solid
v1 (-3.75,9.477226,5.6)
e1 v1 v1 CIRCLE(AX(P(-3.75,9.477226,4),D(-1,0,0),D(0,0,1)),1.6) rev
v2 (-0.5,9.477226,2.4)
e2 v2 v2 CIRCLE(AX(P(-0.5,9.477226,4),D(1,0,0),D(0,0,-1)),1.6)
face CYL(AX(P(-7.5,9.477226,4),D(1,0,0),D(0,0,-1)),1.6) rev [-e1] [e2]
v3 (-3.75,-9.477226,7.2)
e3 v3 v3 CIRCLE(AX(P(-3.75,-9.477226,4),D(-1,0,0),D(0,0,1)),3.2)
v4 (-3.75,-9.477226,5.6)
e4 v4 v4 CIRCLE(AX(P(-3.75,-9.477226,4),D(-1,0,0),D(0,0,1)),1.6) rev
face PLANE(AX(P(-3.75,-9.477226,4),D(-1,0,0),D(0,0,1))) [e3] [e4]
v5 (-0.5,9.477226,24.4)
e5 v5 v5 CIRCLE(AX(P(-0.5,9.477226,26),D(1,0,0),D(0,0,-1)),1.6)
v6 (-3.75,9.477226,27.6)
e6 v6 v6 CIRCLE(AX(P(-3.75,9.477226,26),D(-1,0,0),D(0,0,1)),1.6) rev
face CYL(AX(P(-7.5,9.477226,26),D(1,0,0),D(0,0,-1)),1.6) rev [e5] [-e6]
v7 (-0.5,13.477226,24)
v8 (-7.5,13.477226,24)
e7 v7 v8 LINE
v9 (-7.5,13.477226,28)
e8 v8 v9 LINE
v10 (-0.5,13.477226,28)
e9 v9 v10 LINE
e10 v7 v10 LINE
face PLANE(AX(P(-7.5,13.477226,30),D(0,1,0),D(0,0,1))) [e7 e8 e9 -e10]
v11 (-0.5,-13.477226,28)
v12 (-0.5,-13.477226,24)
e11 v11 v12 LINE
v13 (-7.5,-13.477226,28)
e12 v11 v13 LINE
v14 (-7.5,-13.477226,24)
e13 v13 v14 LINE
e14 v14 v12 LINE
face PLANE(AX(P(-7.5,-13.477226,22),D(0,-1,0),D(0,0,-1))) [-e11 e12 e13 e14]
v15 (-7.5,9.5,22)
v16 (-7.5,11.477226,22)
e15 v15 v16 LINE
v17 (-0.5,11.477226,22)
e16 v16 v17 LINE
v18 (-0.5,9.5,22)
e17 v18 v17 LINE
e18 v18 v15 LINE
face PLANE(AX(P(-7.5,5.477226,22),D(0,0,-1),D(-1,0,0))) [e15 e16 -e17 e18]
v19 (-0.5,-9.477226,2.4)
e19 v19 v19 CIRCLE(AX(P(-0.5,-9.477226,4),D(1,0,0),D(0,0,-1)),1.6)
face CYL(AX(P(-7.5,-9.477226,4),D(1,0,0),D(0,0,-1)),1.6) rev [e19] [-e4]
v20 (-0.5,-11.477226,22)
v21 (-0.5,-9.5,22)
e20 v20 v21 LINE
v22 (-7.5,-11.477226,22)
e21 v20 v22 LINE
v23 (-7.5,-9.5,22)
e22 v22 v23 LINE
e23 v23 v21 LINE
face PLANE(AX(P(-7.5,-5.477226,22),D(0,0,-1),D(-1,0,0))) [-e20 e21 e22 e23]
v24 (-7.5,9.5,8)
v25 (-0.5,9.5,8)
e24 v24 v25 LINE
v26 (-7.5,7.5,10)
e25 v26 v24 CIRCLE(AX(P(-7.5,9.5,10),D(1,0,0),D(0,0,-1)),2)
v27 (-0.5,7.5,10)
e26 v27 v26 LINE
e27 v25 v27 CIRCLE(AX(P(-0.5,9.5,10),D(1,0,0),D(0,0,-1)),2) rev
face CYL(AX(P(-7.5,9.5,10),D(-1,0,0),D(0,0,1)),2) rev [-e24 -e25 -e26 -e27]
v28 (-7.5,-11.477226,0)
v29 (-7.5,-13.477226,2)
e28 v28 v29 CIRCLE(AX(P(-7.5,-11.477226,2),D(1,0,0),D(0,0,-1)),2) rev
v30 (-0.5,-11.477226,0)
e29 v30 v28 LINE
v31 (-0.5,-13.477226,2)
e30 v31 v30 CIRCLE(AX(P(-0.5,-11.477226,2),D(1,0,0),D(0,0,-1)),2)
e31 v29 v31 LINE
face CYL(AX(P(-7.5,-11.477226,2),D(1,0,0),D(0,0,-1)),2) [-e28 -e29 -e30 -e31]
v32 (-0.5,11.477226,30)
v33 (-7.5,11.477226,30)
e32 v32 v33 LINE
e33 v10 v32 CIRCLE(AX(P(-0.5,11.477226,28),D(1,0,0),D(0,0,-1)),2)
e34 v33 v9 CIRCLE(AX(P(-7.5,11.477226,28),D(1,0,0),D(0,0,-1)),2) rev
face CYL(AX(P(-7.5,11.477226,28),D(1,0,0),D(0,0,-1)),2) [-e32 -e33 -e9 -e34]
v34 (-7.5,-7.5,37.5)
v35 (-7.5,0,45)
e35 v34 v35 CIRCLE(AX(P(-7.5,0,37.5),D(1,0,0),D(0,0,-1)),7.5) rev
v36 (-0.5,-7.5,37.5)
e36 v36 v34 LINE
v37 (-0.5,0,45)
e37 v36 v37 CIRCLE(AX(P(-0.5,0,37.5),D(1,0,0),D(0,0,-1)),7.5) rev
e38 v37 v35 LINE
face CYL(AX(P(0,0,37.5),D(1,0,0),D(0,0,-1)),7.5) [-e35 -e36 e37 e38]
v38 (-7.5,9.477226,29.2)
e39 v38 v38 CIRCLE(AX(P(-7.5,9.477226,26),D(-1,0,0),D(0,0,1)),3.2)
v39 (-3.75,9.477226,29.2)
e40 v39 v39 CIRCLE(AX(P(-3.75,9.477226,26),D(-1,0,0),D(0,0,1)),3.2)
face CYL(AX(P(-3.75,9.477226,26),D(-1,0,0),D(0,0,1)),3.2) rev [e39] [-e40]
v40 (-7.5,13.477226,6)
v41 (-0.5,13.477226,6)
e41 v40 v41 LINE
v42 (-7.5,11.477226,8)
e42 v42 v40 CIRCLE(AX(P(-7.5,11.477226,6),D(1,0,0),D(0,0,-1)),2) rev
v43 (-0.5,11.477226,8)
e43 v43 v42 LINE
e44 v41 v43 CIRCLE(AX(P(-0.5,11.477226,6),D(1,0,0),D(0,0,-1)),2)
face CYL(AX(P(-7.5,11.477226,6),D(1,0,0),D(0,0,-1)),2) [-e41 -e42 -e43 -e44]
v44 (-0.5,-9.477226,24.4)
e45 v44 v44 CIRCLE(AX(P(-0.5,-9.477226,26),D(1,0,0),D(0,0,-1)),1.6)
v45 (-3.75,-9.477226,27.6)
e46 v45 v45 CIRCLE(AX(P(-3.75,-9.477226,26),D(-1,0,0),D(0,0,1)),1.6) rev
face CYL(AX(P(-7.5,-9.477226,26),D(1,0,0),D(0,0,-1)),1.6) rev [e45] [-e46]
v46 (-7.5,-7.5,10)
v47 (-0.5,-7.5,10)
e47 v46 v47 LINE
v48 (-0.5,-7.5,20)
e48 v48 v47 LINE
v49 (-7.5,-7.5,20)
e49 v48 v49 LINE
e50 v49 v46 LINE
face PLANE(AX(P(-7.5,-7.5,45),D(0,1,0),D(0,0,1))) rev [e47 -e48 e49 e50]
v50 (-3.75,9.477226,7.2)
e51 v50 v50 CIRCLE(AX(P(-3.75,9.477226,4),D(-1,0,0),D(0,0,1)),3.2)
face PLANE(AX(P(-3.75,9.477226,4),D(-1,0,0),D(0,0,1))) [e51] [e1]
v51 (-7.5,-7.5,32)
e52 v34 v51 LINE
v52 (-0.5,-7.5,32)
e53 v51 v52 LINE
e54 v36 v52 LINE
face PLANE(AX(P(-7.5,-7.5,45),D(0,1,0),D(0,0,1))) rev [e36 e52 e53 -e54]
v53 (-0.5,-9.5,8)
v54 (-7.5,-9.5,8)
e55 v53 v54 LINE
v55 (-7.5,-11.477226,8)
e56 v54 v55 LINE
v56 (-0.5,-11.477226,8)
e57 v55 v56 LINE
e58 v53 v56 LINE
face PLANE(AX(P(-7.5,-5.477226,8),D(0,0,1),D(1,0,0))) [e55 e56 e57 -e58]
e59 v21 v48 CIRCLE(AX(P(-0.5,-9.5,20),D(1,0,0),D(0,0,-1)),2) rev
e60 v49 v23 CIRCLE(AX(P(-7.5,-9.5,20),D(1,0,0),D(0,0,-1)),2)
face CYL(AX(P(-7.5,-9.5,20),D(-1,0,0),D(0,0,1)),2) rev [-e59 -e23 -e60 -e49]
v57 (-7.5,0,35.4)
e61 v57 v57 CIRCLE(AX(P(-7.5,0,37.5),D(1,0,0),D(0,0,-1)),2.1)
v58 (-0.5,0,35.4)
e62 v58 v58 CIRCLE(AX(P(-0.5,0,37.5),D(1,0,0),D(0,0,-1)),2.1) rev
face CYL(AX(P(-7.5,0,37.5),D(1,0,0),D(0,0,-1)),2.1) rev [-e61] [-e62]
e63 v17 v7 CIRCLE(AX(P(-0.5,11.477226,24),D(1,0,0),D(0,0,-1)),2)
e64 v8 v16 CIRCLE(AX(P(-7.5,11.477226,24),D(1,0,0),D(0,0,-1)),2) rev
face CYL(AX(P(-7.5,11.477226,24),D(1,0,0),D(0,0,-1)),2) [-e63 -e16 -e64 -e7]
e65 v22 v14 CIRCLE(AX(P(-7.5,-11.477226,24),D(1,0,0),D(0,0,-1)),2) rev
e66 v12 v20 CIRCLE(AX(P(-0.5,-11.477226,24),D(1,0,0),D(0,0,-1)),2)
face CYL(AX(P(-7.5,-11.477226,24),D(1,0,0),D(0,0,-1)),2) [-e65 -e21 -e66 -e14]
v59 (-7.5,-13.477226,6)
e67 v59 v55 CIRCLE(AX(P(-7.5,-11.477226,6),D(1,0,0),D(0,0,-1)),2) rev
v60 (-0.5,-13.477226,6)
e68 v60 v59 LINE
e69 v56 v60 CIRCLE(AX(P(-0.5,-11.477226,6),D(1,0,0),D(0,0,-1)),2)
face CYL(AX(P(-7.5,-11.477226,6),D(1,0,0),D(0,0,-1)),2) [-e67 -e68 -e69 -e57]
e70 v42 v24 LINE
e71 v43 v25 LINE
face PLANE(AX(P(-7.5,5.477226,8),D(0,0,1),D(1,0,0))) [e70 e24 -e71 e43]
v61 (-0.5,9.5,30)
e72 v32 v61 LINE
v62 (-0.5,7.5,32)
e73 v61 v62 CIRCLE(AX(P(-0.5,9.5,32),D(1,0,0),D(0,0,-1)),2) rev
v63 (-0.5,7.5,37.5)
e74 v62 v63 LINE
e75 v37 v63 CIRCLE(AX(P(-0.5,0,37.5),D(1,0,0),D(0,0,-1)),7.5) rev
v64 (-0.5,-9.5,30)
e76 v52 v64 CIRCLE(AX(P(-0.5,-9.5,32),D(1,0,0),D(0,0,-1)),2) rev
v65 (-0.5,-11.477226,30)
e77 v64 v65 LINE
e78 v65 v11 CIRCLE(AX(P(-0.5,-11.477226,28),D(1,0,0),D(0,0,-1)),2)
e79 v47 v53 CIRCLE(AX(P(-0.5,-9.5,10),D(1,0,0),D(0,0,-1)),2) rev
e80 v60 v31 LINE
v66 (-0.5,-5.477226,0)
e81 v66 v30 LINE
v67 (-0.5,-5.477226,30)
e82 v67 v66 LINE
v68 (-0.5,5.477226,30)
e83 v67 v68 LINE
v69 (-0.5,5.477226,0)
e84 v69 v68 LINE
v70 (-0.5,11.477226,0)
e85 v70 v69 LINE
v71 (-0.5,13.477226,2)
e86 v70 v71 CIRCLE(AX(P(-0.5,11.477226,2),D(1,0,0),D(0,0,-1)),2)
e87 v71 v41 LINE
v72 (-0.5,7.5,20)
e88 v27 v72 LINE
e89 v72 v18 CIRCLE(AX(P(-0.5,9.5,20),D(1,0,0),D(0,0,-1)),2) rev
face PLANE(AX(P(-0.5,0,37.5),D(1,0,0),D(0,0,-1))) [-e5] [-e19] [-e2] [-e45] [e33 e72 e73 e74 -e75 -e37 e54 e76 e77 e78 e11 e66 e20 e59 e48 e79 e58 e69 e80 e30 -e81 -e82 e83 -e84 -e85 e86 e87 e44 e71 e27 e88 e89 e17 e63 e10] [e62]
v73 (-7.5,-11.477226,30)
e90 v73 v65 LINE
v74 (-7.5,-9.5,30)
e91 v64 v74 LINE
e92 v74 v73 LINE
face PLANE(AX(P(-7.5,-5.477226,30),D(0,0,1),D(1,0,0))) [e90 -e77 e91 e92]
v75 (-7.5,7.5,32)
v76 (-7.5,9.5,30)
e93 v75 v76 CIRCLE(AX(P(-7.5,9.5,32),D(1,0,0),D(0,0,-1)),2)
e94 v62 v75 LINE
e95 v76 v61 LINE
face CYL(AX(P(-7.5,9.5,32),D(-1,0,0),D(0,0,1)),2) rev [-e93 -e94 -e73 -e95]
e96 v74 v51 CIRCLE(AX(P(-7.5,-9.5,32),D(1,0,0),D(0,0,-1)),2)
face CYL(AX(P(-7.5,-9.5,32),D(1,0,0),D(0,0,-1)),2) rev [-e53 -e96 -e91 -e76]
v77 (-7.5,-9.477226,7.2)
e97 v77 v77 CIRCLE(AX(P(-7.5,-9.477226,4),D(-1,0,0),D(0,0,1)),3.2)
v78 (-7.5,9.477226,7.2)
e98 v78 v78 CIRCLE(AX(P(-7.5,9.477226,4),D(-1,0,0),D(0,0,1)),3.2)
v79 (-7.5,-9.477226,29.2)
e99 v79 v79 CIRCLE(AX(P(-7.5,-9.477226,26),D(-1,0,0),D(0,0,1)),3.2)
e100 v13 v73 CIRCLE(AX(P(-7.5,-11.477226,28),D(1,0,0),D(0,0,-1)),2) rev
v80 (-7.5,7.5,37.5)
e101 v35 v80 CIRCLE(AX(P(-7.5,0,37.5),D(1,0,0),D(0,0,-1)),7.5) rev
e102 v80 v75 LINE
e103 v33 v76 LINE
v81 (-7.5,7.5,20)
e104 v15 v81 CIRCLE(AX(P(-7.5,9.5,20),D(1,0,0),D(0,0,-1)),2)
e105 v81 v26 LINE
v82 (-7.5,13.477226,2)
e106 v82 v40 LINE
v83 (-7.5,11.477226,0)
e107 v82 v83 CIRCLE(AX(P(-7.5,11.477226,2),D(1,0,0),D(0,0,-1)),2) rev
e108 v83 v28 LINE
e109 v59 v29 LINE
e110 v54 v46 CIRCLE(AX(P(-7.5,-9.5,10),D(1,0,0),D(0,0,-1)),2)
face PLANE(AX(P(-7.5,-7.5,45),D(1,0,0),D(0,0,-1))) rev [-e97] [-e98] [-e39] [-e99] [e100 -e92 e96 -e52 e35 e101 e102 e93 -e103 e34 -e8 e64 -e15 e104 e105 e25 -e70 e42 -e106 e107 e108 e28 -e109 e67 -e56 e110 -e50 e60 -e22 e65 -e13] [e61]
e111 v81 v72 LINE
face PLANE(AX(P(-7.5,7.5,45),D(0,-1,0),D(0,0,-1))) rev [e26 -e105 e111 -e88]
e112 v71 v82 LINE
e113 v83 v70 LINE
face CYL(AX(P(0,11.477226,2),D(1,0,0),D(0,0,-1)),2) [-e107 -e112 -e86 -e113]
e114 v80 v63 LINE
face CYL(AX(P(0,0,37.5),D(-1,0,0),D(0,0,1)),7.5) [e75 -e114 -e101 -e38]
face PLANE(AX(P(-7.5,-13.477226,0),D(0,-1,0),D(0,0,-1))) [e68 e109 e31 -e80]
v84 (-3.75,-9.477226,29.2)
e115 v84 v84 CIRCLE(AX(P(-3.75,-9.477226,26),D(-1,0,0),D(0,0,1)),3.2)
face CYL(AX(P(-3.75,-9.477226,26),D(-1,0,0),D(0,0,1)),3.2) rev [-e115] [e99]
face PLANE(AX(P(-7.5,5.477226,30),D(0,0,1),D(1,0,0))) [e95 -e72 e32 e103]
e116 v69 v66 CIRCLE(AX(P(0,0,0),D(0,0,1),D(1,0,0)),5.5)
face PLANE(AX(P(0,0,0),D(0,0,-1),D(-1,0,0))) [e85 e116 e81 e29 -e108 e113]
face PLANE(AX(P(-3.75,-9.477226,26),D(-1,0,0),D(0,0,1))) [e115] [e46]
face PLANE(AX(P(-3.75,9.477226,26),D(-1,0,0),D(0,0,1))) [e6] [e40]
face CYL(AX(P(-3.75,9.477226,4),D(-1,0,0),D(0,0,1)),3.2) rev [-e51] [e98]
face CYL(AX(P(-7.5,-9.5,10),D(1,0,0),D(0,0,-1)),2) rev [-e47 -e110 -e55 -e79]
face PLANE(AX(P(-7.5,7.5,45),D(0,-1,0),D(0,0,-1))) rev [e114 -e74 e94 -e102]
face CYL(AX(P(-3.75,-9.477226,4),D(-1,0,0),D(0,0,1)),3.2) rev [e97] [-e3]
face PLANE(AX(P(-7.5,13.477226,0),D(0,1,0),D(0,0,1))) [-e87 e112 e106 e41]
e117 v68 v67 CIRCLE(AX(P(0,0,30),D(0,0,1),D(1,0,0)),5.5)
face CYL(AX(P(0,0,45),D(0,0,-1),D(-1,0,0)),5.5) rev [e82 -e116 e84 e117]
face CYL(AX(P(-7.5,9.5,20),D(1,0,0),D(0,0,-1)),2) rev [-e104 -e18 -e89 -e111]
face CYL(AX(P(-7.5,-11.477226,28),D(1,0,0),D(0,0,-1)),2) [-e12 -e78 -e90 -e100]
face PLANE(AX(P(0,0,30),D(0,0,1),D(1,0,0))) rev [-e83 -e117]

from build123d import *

# Parameters (mm, degrees)
SKETCH_1_W          = 15
SKETCH_1_H          = 15
SKETCH_1_R          = 5.5
EXTRUDE_1_DEPTH     = 45
SKETCH_5_W          = 15
SKETCH_5_H          = 15
EXTRUDE_3_DEPTH     = 15
FILLET_2_R          = 7.5
SKETCH_6_R          = 2.1
CUT_EXTRUDE_1_DEPTH = 49.023431781
CUT_EXTRUDE_2_DEPTH = 8
SKETCH_9_W          = 8
SKETCH_9_H          = 8
SKETCH_9_R          = 1.6
EXTRUDE_4_DEPTH     = 7
FILLET_3_R          = 2
SKETCH_11_R         = 3.2
CUT_EXTRUDE_3_DEPTH = 3.75


with BuildPart() as part:
    # ｽｹｯﾁ1 → ﾎﾞｽ - 押し出し1 (new body)
    with BuildSketch(Plane.XY):
        Rectangle(SKETCH_1_W, SKETCH_1_H)
        with Locations(Location((0, 0, 0), (0, 0, 180))):
            Circle(SKETCH_1_R, mode=Mode.SUBTRACT)
    extrude(amount=EXTRUDE_1_DEPTH)

    # ｽｹｯﾁ5 → ﾎﾞｽ - 押し出し3 (add)
    with BuildSketch(Plane.XY.offset(45)):
        Rectangle(SKETCH_5_W, SKETCH_5_H)
    extrude(amount=-EXTRUDE_3_DEPTH)

    # ﾌｨﾚｯﾄ2
    fillet_2_edges = [part.edges().sort_by_distance(p)[0] for p in [
        (0, -7.5, 45),
        (0, 7.5, 45),
    ]]
    fillet(fillet_2_edges, radius=FILLET_2_R - 0.0001)  # a hair under: the kernel refuses the full size

    # ｽｹｯﾁ6 → ｶｯﾄ - 押し出し1 (cut, through all)
    with BuildSketch(Plane(origin=(7.5, 0, 0), x_dir=(0, 0, -1), z_dir=(1, 0, 0))):
        with Locations((-37.5, 0)):
            Circle(SKETCH_6_R)
    extrude(amount=-CUT_EXTRUDE_1_DEPTH, mode=Mode.SUBTRACT)

    # ｽｹｯﾁ7 → ｶｯﾄ - 押し出し2 (cut)
    with BuildSketch(Plane(origin=(7.5, 0, 0), x_dir=(0, 0, -1), z_dir=(1, 0, 0))):
        with BuildLine():
            Line((-37.5, -9.5), (2, -9.5))
            Line((2, -9.5), (2, 9.5))
            Line((2, 9.5), (-37.5, 9.5))
            ThreePointArc((-37.5, 9.5), (-44.217514421, 6.717514421), (-47, 0))
            ThreePointArc((-47, 0), (-44.217514421, -6.717514421), (-37.5, -9.5))
        make_face()
    extrude(amount=-CUT_EXTRUDE_2_DEPTH, mode=Mode.SUBTRACT)

    # ｽｹｯﾁ9 → ﾎﾞｽ - 押し出し4 (add)
    # profile 1 of 4: a face of its own
    with BuildSketch(Plane(origin=(-0.5, 0, 0), x_dir=(0, 0, -1), z_dir=(1, 0, 0))):
        with Locations((-4, -9.477225575)):
            Rectangle(SKETCH_9_W, SKETCH_9_H)
        with Locations((-4, -9.477225575)):
            Circle(SKETCH_9_R, mode=Mode.SUBTRACT)
    # profile 2 of 4: a face of its own
    with BuildSketch(Plane(origin=(-0.5, 0, 0), x_dir=(0, 0, -1), z_dir=(1, 0, 0))):
        with Locations((-26, 9.477225575)):
            Rectangle(SKETCH_9_W, SKETCH_9_H)
        with Locations((-26, 9.477225575)):
            Circle(SKETCH_9_R, mode=Mode.SUBTRACT)
    # profile 3 of 4: a face of its own
    with BuildSketch(Plane(origin=(-0.5, 0, 0), x_dir=(0, 0, -1), z_dir=(1, 0, 0))):
        with Locations((-4, 9.477225575)):
            Rectangle(SKETCH_9_W, SKETCH_9_H)
        with Locations((-4, 9.477225575)):
            Circle(SKETCH_9_R, mode=Mode.SUBTRACT)
    # profile 4 of 4: a face of its own
    with BuildSketch(Plane(origin=(-0.5, 0, 0), x_dir=(0, 0, -1), z_dir=(1, 0, 0))):
        with Locations((-26, -9.477225575)):
            Rectangle(SKETCH_9_W, SKETCH_9_H)
        with Locations((-26, -9.477225575)):
            Circle(SKETCH_9_R, mode=Mode.SUBTRACT)
    extrude(amount=-EXTRUDE_4_DEPTH)

    # ﾌｨﾚｯﾄ3
    fillet_3_edges = [part.edges().sort_by_distance(p)[0] for p in [
        (-4, 13.477225575, 22),
        (-4, 7.5, 30),
        (-4, 13.477225575, 30),
        (-4, 7.5, 22),
        (-4, 13.477225575, 0),
        (-4, 7.5, 8),
        (-4, 13.477225575, 8),
        (-4, -13.477225575, 30),
        (-4, -7.5, 22),
        (-4, -13.477225575, 22),
        (-4, -7.5, 30),
        (-4, -13.477225575, 8),
        (-4, -13.477225575, 0),
        (-4, -7.5, 8),
    ]]
    fillet(fillet_3_edges, radius=FILLET_3_R)

    # ｽｹｯﾁ11 → ｶｯﾄ - 押し出し3 (cut)
    with BuildSketch(Plane.ZY.offset(7.5)):
        with Locations((4, 9.477225575)):
            Circle(SKETCH_11_R)
        with Locations((26, 9.477225575)):
            Circle(SKETCH_11_R)
        with Locations((26, -9.477225575)):
            Circle(SKETCH_11_R)
        with Locations((4, -9.477225575)):
            Circle(SKETCH_11_R)
    extrude(amount=-CUT_EXTRUDE_3_DEPTH, mode=Mode.SUBTRACT)


solid = part.part
